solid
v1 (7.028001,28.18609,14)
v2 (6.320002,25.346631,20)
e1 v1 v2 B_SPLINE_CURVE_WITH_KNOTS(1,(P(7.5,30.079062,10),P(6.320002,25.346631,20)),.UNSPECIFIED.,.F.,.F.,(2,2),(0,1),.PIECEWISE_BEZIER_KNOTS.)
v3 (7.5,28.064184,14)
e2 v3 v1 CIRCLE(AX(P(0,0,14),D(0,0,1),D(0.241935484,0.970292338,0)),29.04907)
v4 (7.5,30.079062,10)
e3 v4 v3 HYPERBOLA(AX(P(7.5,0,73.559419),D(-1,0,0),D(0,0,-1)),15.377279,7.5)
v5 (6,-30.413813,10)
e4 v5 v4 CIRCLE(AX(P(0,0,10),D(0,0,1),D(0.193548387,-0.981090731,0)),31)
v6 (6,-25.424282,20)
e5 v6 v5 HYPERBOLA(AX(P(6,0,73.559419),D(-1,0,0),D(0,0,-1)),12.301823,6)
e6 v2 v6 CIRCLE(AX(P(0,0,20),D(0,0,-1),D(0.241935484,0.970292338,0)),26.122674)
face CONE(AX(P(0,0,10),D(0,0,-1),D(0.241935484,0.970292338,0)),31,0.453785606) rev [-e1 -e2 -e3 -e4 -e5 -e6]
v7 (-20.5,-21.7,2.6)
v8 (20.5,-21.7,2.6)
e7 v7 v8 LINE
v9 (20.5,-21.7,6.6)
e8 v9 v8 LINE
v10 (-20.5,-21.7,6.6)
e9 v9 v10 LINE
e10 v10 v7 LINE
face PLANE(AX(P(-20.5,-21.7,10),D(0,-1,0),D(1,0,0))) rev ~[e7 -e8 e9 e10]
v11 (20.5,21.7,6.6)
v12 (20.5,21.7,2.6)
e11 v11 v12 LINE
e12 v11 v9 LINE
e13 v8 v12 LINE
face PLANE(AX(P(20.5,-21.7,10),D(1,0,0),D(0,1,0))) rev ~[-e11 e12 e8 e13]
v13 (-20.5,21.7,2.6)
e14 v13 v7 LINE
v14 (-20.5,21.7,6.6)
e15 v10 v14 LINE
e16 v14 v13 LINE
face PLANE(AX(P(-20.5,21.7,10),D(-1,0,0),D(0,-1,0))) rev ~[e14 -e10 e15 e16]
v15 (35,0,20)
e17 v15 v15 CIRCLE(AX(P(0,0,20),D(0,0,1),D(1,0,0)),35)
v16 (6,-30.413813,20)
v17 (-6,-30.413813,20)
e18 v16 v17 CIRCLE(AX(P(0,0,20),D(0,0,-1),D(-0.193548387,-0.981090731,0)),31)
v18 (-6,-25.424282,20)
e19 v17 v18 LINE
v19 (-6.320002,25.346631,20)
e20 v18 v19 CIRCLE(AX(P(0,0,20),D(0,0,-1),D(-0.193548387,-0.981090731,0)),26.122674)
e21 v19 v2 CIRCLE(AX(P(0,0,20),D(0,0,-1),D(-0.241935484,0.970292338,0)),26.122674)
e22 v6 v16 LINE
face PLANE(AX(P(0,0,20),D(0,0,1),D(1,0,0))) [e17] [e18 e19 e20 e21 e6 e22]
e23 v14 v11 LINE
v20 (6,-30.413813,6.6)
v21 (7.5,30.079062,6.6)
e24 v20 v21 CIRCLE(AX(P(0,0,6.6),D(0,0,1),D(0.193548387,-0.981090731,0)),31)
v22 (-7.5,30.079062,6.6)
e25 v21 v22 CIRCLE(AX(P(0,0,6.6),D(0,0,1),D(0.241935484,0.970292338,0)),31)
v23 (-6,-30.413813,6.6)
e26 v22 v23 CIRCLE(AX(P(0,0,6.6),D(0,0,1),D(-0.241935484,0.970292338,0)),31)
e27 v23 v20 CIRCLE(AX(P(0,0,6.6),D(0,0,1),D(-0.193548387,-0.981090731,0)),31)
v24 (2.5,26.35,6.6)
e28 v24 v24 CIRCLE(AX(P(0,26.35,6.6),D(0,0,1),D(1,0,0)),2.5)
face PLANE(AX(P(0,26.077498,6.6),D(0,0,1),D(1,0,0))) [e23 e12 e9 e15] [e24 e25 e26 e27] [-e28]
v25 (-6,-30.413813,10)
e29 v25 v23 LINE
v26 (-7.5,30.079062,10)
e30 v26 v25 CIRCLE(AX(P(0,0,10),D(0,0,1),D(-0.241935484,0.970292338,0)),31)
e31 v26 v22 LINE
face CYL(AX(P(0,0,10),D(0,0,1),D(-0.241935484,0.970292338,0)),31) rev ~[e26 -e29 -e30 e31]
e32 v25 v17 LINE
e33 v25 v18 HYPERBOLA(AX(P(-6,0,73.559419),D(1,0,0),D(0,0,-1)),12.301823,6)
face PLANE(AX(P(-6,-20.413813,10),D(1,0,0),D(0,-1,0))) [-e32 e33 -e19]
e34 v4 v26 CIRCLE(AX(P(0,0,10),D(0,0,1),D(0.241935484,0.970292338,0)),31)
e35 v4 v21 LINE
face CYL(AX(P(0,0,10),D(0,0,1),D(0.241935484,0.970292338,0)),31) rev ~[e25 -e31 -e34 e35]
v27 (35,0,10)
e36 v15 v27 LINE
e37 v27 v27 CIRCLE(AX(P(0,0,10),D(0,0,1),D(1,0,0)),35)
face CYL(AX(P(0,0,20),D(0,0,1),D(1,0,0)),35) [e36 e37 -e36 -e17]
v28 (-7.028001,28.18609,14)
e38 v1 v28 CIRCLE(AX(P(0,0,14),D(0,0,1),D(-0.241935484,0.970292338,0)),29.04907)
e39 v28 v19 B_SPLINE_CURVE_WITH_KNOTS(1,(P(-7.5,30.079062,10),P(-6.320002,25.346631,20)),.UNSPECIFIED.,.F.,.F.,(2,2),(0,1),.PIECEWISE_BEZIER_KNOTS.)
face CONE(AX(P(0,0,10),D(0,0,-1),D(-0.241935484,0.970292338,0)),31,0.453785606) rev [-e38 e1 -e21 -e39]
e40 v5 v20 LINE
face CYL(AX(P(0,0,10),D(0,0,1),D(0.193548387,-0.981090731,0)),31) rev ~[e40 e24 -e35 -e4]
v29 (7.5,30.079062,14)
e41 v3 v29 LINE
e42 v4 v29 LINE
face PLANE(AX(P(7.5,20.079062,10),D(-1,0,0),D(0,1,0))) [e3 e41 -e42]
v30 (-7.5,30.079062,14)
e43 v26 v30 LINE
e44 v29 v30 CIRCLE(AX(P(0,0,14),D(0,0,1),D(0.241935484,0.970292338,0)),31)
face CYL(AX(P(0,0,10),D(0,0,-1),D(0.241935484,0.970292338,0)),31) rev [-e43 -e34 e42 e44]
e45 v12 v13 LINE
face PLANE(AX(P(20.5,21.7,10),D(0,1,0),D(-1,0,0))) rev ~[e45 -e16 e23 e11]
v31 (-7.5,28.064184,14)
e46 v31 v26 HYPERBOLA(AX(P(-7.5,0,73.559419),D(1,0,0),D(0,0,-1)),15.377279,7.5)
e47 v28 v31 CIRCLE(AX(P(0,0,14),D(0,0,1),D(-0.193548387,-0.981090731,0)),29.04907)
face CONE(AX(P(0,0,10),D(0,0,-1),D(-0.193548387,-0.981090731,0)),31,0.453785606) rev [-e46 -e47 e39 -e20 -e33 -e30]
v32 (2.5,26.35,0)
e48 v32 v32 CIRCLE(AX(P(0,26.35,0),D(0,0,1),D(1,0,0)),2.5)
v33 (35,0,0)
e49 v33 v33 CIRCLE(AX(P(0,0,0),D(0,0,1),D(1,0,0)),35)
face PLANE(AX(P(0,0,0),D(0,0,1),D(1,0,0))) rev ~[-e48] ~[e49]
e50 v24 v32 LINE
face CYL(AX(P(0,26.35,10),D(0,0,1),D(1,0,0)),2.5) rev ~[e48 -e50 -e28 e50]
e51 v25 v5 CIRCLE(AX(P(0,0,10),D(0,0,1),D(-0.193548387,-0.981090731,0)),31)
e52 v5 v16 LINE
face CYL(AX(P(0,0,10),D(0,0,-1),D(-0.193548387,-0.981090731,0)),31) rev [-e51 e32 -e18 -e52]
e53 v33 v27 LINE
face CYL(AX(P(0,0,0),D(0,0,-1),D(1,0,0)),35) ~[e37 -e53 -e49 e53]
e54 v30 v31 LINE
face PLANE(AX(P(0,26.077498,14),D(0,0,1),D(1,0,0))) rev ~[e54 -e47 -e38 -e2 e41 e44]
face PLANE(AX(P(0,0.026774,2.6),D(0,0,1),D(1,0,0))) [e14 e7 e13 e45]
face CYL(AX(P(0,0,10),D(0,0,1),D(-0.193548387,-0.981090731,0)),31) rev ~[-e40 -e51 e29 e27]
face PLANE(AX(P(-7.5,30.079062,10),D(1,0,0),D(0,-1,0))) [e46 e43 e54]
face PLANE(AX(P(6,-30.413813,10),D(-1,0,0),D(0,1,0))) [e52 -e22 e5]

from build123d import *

# Parameters (mm, degrees)
F0_R      = 35
F1_DEPTH  = 10
F2_R      = 2.5
F3_DEPTH  = 3.4
F4_DEPTH  = 10.001
F5_DEPTH  = 7.4
F2_R_2    = 35
F6_DEPTH  = 10
F6_TAPER  = -26
F7_R      = 39.8773258857
F7_R_2    = 35
F8_DEPTH  = 20.001
F9_DEPTH  = 4
F10_DEPTH = 10.0010001


# Not quite as in the source:
# - a feature names something its author has since deleted; it is built from what else it names


with BuildPart() as f1:
    # F0 (on Top) → F1 (new body)
    with BuildSketch(Plane.XY):
        Circle(F0_R)
    extrude(amount=F1_DEPTH)

    # F2 (on face) → F3 (cut)
    with BuildSketch(Plane.XY.offset(10)):
        with BuildLine():
            Line((7.5, 21.7), (7.5, 30.0790624854))
            ThreePointArc((7.5, 30.0790624854), (0, 31), (-7.5, 30.0790624854))
            Line((-7.5, 30.0790624854), (-7.5, 21.7))
            Line((-7.5, 21.7), (7.5, 21.7))
        make_face()
        with Locations((0, 26.35)):
            Circle(F2_R, mode=Mode.SUBTRACT)
        with BuildLine():
            Line((-7.5, 21.7), (-7.5, 30.0790624854))
            ThreePointArc((-7.5, 30.0790624854), (-30.9904741103, -0.7684493597), (-6, -30.4138126515))
            Line((-6, -30.4138126515), (-6, -21.7))
            Line((-6, -21.7), (-20.5, -21.7))
            Line((-20.5, -21.7), (-20.5, 21.7))
            Line((-20.5, 21.7), (-7.5, 21.7))
        make_face()
        with BuildLine():
            ThreePointArc((-6, -30.4138126515), (0, -31), (6, -30.4138126515))
            Line((6, -30.4138126515), (6, -21.7))
            Line((6, -21.7), (-6, -21.7))
            Line((-6, -21.7), (-6, -30.4138126515))
        make_face()
        with BuildLine():
            ThreePointArc((6, -30.4138126515), (23.9478600297, -19.685019685), (31, 0))
            ThreePointArc((31, 0), (24.4284670006, 19.085334684), (7.5, 30.0790624854))
            Line((7.5, 30.0790624854), (7.5, 21.7))
            Line((7.5, 21.7), (20.5, 21.7))
            Line((20.5, 21.7), (20.5, -21.7))
            Line((20.5, -21.7), (6, -21.7))
            Line((6, -21.7), (6, -30.4138126515))
        make_face()
    extrude(amount=-F3_DEPTH, mode=Mode.SUBTRACT)

    # F2 (on face) → F4 (cut, through all)
    with BuildSketch(Plane.XY.offset(10)):
        with Locations((0, 26.35)):
            Circle(F2_R)
    extrude(amount=-F4_DEPTH, mode=Mode.SUBTRACT)

    # F2 (on face) → F5 (cut)
    with BuildSketch(Plane.XY.offset(10)):
        Polygon((20.5, 21.7), (7.5, 21.7), (7.5, 20.0790624854), (0, 20.0790624854), (-7.5, 20.0790624854), (-7.5, 21.7), (-20.5, 21.7), (-20.5, -21.7), (-6, -21.7), (-6, -20.4138126515), (0, -20.4138126515), (6, -20.4138126515), (6, -21.7), (20.5, -21.7), align=None)
        Polygon((7.5, 20.0790624854), (7.5, 21.7), (-7.5, 21.7), (-7.5, 20.0790624854), (0, 20.0790624854), align=None)
        Polygon((-6, -21.7), (6, -21.7), (6, -20.4138126515), (0, -20.4138126515), (-6, -20.4138126515), align=None)
    extrude(amount=-F5_DEPTH, mode=Mode.SUBTRACT)

    # F2 (on face) → F6 (join)
    with BuildSketch(Plane.XY.offset(10)):
        Circle(F2_R_2)
        with BuildLine():
            ThreePointArc((7.5, 30.0790624854), (24.4284670006, 19.085334684), (31, 0))
            ThreePointArc((31, 0), (23.9478600297, -19.685019685), (6, -30.4138126515))
            ThreePointArc((6, -30.4138126515), (0, -31), (-6, -30.4138126515))
            ThreePointArc((-6, -30.4138126515), (-30.9904741103, -0.7684493597), (-7.5, 30.0790624854))
            ThreePointArc((-7.5, 30.0790624854), (0, 31), (7.5, 30.0790624854))
        make_face(mode=Mode.SUBTRACT)
    extrude(amount=F6_DEPTH, taper=F6_TAPER)

    # F7 (on face) → F8 (cut, through all)
    with BuildSketch(Plane.XY.offset(20)):
        Circle(F7_R)
        Circle(F7_R_2, mode=Mode.SUBTRACT)
    extrude(amount=-F8_DEPTH, mode=Mode.SUBTRACT)

    # F2 (on face) → F9 (cut)
    with BuildSketch(Plane.XY.offset(10)):
        with BuildLine():
            Line((7.5, 21.7), (7.5, 30.0790624854))
            ThreePointArc((7.5, 30.0790624854), (0, 31), (-7.5, 30.0790624854))
            Line((-7.5, 30.0790624854), (-7.5, 21.7))
            Line((-7.5, 21.7), (7.5, 21.7))
        make_face()
        with Locations((0, 26.35)):
            Circle(F2_R, mode=Mode.SUBTRACT)
        Polygon((7.5, 20.0790624854), (7.5, 21.7), (-7.5, 21.7), (-7.5, 20.0790624854), (0, 20.0790624854), align=None)
        with Locations((0, 26.35)):
            Circle(F2_R)
    extrude(amount=F9_DEPTH, mode=Mode.SUBTRACT)

    # F2 (on face) → F10 (cut, through all)
    with BuildSketch(Plane.XY.offset(10)):
        with BuildLine():
            ThreePointArc((-6, -30.4138126515), (0, -31), (6, -30.4138126515))
            Line((6, -30.4138126515), (6, -21.7))
            Line((6, -21.7), (-6, -21.7))
            Line((-6, -21.7), (-6, -30.4138126515))
        make_face()
        Polygon((-6, -21.7), (6, -21.7), (6, -20.4138126515), (0, -20.4138126515), (-6, -20.4138126515), align=None)
    extrude(amount=F10_DEPTH, mode=Mode.SUBTRACT)


solid = f1.part
